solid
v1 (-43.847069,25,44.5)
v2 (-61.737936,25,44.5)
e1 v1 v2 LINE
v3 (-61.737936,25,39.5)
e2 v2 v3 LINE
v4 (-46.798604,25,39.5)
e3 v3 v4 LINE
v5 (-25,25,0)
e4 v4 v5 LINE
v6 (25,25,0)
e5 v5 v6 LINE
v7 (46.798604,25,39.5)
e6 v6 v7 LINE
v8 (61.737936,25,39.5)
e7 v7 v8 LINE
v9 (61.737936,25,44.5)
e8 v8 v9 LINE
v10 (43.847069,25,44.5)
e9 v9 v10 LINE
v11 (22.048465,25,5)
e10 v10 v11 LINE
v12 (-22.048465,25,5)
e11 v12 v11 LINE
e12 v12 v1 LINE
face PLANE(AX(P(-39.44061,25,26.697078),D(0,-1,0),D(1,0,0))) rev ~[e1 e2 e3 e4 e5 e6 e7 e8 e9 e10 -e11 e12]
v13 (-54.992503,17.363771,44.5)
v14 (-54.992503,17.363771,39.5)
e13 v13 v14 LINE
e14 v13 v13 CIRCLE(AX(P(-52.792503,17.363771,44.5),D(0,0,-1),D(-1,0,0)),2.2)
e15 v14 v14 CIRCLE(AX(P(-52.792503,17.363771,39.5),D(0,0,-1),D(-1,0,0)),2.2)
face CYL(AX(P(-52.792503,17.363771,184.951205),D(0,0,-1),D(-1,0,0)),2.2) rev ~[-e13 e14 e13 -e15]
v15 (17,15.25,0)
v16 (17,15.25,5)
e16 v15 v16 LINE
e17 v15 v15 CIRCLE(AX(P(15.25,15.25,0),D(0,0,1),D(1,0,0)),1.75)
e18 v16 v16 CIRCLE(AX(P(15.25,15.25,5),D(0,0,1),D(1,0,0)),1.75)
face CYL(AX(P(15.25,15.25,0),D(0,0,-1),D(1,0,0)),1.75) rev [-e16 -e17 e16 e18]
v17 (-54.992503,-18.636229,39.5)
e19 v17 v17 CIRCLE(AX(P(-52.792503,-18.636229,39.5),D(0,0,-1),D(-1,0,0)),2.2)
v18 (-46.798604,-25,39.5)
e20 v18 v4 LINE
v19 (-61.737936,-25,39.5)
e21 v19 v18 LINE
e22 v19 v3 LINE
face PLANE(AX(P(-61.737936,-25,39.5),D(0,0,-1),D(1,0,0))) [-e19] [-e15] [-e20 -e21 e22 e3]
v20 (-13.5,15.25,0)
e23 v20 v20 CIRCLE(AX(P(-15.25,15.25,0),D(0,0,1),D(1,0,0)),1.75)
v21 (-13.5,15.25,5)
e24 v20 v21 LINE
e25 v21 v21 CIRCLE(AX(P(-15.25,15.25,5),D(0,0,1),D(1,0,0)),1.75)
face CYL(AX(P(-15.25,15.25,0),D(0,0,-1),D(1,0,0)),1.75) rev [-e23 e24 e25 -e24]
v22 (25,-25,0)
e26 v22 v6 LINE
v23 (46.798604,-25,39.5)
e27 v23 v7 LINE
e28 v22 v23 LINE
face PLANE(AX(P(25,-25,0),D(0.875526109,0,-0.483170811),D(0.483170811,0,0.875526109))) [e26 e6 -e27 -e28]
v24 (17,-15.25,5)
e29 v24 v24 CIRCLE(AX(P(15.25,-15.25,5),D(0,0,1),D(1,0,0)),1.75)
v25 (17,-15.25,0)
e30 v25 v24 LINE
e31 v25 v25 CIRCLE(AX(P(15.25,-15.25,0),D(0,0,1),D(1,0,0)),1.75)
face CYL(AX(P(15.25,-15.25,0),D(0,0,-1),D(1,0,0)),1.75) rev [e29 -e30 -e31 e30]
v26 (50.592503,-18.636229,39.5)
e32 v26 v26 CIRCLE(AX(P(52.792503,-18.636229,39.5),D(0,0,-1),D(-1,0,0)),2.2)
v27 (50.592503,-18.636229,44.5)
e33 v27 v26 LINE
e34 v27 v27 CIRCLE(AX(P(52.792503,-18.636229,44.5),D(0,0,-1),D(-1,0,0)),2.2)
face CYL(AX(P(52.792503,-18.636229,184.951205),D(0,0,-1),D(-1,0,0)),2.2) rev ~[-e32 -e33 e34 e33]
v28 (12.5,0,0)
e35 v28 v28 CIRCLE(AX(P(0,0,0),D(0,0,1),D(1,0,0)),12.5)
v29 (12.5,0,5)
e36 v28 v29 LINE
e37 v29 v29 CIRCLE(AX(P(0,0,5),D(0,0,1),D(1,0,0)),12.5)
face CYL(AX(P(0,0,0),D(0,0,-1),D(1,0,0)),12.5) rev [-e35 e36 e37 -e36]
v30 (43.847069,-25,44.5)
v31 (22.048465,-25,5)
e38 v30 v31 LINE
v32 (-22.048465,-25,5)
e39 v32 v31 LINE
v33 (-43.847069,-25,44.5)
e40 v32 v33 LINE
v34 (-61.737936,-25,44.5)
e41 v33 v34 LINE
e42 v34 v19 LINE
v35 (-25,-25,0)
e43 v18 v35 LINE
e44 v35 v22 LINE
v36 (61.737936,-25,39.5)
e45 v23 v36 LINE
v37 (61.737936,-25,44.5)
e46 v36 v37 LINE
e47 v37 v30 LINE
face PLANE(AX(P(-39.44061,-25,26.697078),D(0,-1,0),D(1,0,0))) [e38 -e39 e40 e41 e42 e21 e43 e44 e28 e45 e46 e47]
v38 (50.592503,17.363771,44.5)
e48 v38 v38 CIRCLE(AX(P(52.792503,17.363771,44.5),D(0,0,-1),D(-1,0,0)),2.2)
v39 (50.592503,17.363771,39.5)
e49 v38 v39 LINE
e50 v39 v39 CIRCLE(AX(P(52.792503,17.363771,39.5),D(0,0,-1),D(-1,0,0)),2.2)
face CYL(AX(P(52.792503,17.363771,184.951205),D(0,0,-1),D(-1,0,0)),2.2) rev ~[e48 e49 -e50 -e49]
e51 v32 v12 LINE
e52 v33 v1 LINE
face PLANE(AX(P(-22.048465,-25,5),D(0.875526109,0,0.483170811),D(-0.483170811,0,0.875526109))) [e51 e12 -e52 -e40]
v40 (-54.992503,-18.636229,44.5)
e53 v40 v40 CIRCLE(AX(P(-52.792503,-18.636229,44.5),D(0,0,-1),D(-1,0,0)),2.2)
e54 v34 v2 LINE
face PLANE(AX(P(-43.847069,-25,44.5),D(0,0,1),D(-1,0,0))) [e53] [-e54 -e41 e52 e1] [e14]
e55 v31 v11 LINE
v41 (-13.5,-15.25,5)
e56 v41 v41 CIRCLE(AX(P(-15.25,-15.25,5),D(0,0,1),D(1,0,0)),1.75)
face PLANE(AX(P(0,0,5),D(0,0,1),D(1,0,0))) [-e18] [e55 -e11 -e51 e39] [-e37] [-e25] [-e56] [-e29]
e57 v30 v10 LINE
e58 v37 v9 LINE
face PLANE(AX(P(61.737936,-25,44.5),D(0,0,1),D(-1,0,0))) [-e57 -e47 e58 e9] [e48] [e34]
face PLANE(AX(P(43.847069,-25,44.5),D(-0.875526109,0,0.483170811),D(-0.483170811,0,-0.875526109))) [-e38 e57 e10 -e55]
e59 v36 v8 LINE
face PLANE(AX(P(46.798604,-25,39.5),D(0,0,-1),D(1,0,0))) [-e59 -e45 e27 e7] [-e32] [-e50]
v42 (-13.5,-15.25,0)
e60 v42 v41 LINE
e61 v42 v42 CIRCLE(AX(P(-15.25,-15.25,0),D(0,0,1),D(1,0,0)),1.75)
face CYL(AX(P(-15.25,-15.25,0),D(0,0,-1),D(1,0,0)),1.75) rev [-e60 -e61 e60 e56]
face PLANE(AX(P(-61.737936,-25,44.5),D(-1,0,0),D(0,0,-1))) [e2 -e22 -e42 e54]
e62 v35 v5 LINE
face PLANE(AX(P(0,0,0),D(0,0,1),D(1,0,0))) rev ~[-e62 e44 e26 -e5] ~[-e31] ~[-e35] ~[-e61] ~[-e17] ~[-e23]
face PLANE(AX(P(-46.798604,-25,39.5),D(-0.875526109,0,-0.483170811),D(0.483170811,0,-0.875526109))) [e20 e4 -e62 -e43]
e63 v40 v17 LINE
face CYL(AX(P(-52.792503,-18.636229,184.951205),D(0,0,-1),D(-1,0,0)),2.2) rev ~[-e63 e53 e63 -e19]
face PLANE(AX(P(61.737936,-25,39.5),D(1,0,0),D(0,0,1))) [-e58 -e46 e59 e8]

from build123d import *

# Parameters (mm, degrees)
F0_W     = 50
F0_H     = 50
F0_R     = 1.75
F0_R_2   = 12.5
F1_DEPTH = 5
F3_DEPTH = 50
F5_D     = 4.4


with BuildPart() as f1:
    # F0 (on Top) → F1 (new body)
    with BuildSketch(Plane.XY):
        Rectangle(F0_W, F0_H)
        with Locations((-15.25, -15.25)):
            Circle(F0_R, mode=Mode.SUBTRACT)
        with Locations((15.25, -15.25)):
            Circle(F0_R, mode=Mode.SUBTRACT)
        with Locations((-15.25, 15.25)):
            Circle(F0_R, mode=Mode.SUBTRACT)
        Circle(F0_R_2, mode=Mode.SUBTRACT)
        with Locations((15.25, 15.25)):
            Circle(F0_R, mode=Mode.SUBTRACT)
    extrude(amount=F1_DEPTH)

    # F2 (on face) → F3 (join, through all)
    with BuildSketch(Plane.XZ.offset(25)):
        Polygon((-46.7986041229, 39.5), (-25, 0), (-25, 5), (-22.0484650111, 5), (-43.847069134, 44.5), (-61.7379361051, 44.5), (-61.7379361051, 39.5), align=None)
        Polygon((25, 5), (25, 0), (46.7986041229, 39.5), (61.7379361051, 39.5), (61.7379361051, 44.5), (43.847069134, 44.5), (22.0484650111, 5), align=None)
    extrude(amount=-F3_DEPTH)

    # F5 (through all)
    with Locations(Plane.XY.offset(44.5)):
        with Locations((-52.7925026196, 17.3637714833), (-52.7925026196, -18.6362285167), (52.7925026196, -18.6362285167), (52.7925026196, 17.3637714833)):
            Hole(F5_D / 2)


solid = f1.part
